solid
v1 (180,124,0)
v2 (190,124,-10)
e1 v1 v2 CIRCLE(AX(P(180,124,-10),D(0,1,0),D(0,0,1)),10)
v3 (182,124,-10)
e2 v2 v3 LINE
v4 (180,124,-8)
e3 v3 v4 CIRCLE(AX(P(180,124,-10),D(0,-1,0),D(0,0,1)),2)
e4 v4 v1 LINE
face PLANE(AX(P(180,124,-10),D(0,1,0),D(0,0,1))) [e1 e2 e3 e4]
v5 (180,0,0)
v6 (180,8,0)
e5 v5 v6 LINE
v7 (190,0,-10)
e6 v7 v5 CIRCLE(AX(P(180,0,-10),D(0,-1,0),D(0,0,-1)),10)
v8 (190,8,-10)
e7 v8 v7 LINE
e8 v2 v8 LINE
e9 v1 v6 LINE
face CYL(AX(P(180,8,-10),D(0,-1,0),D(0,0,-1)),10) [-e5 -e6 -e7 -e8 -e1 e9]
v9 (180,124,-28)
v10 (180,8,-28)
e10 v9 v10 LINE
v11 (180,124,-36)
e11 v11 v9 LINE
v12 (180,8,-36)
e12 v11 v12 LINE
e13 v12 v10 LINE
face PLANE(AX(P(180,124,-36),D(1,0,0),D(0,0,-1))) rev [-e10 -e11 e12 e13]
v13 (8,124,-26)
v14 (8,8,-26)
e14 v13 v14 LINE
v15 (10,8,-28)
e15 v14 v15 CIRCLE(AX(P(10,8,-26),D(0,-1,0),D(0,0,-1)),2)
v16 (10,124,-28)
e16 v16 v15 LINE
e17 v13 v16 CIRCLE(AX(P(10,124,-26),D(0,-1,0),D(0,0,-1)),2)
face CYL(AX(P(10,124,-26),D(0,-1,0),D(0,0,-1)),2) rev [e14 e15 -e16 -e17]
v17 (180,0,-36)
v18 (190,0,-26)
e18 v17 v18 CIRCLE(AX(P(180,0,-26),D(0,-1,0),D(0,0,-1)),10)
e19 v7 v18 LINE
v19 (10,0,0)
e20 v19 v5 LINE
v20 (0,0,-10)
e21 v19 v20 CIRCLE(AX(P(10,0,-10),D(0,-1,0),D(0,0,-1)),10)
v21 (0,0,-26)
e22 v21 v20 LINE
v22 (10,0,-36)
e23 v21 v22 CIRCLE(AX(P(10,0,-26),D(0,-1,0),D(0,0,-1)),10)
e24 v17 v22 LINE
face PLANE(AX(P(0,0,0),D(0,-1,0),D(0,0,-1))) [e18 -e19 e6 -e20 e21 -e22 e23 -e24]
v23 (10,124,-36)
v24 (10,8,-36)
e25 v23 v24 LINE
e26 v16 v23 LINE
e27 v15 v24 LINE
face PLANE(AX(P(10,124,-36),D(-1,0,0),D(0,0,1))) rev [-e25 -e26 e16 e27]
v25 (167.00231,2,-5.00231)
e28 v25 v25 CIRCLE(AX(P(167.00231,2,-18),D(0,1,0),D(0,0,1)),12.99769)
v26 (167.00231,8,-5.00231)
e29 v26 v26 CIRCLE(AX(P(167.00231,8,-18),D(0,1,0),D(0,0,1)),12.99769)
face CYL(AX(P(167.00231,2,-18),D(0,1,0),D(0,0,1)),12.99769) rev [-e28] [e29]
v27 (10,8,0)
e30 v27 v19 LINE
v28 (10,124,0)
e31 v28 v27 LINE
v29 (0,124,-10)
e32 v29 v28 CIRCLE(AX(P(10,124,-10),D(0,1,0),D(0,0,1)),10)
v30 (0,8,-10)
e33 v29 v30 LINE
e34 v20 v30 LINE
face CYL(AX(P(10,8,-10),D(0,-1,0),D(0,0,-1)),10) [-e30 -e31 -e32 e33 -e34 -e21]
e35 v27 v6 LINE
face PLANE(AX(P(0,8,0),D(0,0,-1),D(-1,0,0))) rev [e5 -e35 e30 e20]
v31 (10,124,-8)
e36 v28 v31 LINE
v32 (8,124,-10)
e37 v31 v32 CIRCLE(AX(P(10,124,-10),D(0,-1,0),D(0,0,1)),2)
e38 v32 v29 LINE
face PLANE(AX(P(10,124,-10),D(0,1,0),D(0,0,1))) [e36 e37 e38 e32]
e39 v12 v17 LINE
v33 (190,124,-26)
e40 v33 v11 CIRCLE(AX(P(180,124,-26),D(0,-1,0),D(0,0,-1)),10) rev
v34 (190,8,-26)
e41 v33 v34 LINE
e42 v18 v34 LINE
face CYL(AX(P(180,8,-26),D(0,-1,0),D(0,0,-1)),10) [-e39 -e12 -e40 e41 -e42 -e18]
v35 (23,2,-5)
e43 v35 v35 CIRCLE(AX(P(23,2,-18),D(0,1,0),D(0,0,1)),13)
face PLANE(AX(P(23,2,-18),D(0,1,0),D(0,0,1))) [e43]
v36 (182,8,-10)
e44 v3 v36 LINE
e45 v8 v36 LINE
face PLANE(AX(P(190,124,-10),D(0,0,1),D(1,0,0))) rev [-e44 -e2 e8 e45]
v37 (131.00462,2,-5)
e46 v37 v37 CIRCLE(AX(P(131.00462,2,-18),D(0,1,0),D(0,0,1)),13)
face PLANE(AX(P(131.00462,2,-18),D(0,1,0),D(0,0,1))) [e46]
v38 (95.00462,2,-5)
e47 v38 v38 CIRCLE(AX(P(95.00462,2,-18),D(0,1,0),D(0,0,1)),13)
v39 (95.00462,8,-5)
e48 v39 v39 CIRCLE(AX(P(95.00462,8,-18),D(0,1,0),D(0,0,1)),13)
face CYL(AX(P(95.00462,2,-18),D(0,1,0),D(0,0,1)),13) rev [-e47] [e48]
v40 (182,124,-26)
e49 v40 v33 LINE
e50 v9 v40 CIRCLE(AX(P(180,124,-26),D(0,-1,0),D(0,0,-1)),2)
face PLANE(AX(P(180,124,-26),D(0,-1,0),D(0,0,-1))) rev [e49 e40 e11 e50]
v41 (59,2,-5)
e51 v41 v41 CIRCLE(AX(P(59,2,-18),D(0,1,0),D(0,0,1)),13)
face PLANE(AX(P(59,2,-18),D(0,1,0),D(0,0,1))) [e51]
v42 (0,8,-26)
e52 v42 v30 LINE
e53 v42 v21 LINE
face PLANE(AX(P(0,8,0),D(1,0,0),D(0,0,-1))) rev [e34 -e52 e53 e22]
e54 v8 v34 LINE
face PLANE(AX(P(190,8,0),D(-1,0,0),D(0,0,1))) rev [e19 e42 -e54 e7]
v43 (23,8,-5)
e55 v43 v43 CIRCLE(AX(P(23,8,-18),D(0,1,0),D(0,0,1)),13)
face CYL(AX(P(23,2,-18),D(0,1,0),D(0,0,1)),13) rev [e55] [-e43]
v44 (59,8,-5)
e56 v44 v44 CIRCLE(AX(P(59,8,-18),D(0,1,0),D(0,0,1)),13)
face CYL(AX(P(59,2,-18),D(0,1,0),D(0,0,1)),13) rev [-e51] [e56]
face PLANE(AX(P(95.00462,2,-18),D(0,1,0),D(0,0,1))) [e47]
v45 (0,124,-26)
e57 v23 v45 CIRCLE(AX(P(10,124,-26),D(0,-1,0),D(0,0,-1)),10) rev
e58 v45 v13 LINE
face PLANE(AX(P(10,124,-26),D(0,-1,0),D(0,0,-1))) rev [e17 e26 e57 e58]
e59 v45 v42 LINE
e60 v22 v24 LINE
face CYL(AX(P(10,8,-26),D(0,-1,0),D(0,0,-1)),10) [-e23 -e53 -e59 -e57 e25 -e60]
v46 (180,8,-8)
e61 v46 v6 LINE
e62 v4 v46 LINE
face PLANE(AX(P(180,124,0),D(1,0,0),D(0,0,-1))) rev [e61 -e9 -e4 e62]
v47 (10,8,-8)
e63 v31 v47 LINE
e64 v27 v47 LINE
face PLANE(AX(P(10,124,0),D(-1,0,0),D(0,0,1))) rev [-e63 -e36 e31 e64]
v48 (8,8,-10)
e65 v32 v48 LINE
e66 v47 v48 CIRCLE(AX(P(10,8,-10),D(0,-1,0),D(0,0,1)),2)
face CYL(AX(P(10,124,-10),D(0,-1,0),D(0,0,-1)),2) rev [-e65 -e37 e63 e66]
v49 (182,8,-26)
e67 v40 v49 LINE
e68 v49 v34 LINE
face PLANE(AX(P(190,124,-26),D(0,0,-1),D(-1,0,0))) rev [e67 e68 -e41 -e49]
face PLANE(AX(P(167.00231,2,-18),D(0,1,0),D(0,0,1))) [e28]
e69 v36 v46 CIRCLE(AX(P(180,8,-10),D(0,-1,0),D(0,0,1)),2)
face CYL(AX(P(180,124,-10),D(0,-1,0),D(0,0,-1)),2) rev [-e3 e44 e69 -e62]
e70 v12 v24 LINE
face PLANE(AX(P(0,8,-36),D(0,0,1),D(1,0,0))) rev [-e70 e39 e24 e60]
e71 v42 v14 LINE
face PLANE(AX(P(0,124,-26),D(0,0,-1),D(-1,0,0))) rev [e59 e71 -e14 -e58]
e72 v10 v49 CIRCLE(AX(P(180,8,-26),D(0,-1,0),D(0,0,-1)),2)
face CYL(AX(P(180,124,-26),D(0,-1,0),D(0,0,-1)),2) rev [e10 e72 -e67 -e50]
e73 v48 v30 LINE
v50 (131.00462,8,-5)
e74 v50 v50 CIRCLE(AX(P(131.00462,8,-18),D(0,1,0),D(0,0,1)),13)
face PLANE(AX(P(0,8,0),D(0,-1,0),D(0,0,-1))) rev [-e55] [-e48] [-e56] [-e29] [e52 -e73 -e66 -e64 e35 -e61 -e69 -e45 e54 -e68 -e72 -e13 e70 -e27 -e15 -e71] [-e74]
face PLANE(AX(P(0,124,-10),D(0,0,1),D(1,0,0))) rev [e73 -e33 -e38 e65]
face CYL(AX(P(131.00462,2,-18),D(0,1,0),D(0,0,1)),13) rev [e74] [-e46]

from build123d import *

# Parameters (mm, degrees)
SKETCH5_W           = 190
SKETCH5_H           = 36
BOSS_EXTRUDE1_DEPTH = 8
SKETCH6_R           = 13
SKETCH6_R_2         = 12.99768992
CUT_EXTRUDE1_DEPTH  = 6
BOSS_EXTRUDE2_DEPTH = 116
FILLET1_R           = 10


with BuildPart() as part:
    # Sketch5 → Boss-Extrude1 (new body)
    with BuildSketch(Plane(origin=(0, 0, 0), x_dir=(1, 0, 0), z_dir=(0, 1, 0))):
        with Locations((95, 18)):
            Rectangle(SKETCH5_W, SKETCH5_H)
    extrude(amount=BOSS_EXTRUDE1_DEPTH)

    # Sketch6 → Cut-Extrude1 (cut)
    with BuildSketch(Plane(origin=(0, 8, 0), x_dir=(1, 0, 0), z_dir=(0, 1, 0))):
        with Locations(Location((23, 18, 0), (0, 0, 270))):
            Circle(SKETCH6_R)
        with Locations(Location((59, 18, 0), (0, 0, 270))):
            Circle(SKETCH6_R)
        with Locations(Location((95.004620161, 18, 0), (0, 0, 270))):
            Circle(SKETCH6_R)
        with Locations(Location((131.004620161, 18, 0), (0, 0, 270))):
            Circle(SKETCH6_R)
        with Locations(Location((167.00231008, 18, 0), (0, 0, 270))):
            Circle(SKETCH6_R_2)
    extrude(amount=-CUT_EXTRUDE1_DEPTH, mode=Mode.SUBTRACT)

    # Sketch7 → Boss-Extrude2 (add)
    with BuildSketch(Plane(origin=(0, 8, 0), x_dir=(1, 0, 0), z_dir=(0, 1, 0))):
        with BuildLine():
            Line((0, 0), (10, 0))
            Line((10, 0), (10, 8))
            ThreePointArc((10, 8), (8.585786438, 8.585786438), (8, 10))
            Line((8, 10), (0, 10))
            Line((0, 10), (0, 0))
        make_face()
        with BuildLine():
            Line((0, 36), (10, 36))
            Line((10, 36), (10, 28))
            ThreePointArc((10, 28), (8.585786438, 27.414213562), (8, 26))
            Line((8, 26), (0, 26))
            Line((0, 26), (0, 36))
        make_face()
        with BuildLine():
            Line((190, 36), (180, 36))
            Line((180, 36), (180, 28))
            ThreePointArc((180, 28), (181.414213562, 27.414213562), (182, 26))
            Line((182, 26), (190, 26))
            Line((190, 26), (190, 36))
        make_face()
        with BuildLine():
            Line((190, 0), (180, 0))
            Line((180, 0), (180, 8))
            ThreePointArc((180, 8), (181.414213562, 8.585786438), (182, 10))
            Line((182, 10), (190, 10))
            Line((190, 10), (190, 0))
        make_face()
    extrude(amount=BOSS_EXTRUDE2_DEPTH)

    # Fillet1
    fillet1_edges = [part.edges().sort_by_distance(p)[0] for p in [
        (190, 62, 0),
        (190, 62, -36),
        (0, 62, -36),
        (0, 62, 0),
    ]]
    fillet(fillet1_edges, radius=FILLET1_R - 0.0001)  # a hair under: the kernel refuses the full size


solid = part.part
